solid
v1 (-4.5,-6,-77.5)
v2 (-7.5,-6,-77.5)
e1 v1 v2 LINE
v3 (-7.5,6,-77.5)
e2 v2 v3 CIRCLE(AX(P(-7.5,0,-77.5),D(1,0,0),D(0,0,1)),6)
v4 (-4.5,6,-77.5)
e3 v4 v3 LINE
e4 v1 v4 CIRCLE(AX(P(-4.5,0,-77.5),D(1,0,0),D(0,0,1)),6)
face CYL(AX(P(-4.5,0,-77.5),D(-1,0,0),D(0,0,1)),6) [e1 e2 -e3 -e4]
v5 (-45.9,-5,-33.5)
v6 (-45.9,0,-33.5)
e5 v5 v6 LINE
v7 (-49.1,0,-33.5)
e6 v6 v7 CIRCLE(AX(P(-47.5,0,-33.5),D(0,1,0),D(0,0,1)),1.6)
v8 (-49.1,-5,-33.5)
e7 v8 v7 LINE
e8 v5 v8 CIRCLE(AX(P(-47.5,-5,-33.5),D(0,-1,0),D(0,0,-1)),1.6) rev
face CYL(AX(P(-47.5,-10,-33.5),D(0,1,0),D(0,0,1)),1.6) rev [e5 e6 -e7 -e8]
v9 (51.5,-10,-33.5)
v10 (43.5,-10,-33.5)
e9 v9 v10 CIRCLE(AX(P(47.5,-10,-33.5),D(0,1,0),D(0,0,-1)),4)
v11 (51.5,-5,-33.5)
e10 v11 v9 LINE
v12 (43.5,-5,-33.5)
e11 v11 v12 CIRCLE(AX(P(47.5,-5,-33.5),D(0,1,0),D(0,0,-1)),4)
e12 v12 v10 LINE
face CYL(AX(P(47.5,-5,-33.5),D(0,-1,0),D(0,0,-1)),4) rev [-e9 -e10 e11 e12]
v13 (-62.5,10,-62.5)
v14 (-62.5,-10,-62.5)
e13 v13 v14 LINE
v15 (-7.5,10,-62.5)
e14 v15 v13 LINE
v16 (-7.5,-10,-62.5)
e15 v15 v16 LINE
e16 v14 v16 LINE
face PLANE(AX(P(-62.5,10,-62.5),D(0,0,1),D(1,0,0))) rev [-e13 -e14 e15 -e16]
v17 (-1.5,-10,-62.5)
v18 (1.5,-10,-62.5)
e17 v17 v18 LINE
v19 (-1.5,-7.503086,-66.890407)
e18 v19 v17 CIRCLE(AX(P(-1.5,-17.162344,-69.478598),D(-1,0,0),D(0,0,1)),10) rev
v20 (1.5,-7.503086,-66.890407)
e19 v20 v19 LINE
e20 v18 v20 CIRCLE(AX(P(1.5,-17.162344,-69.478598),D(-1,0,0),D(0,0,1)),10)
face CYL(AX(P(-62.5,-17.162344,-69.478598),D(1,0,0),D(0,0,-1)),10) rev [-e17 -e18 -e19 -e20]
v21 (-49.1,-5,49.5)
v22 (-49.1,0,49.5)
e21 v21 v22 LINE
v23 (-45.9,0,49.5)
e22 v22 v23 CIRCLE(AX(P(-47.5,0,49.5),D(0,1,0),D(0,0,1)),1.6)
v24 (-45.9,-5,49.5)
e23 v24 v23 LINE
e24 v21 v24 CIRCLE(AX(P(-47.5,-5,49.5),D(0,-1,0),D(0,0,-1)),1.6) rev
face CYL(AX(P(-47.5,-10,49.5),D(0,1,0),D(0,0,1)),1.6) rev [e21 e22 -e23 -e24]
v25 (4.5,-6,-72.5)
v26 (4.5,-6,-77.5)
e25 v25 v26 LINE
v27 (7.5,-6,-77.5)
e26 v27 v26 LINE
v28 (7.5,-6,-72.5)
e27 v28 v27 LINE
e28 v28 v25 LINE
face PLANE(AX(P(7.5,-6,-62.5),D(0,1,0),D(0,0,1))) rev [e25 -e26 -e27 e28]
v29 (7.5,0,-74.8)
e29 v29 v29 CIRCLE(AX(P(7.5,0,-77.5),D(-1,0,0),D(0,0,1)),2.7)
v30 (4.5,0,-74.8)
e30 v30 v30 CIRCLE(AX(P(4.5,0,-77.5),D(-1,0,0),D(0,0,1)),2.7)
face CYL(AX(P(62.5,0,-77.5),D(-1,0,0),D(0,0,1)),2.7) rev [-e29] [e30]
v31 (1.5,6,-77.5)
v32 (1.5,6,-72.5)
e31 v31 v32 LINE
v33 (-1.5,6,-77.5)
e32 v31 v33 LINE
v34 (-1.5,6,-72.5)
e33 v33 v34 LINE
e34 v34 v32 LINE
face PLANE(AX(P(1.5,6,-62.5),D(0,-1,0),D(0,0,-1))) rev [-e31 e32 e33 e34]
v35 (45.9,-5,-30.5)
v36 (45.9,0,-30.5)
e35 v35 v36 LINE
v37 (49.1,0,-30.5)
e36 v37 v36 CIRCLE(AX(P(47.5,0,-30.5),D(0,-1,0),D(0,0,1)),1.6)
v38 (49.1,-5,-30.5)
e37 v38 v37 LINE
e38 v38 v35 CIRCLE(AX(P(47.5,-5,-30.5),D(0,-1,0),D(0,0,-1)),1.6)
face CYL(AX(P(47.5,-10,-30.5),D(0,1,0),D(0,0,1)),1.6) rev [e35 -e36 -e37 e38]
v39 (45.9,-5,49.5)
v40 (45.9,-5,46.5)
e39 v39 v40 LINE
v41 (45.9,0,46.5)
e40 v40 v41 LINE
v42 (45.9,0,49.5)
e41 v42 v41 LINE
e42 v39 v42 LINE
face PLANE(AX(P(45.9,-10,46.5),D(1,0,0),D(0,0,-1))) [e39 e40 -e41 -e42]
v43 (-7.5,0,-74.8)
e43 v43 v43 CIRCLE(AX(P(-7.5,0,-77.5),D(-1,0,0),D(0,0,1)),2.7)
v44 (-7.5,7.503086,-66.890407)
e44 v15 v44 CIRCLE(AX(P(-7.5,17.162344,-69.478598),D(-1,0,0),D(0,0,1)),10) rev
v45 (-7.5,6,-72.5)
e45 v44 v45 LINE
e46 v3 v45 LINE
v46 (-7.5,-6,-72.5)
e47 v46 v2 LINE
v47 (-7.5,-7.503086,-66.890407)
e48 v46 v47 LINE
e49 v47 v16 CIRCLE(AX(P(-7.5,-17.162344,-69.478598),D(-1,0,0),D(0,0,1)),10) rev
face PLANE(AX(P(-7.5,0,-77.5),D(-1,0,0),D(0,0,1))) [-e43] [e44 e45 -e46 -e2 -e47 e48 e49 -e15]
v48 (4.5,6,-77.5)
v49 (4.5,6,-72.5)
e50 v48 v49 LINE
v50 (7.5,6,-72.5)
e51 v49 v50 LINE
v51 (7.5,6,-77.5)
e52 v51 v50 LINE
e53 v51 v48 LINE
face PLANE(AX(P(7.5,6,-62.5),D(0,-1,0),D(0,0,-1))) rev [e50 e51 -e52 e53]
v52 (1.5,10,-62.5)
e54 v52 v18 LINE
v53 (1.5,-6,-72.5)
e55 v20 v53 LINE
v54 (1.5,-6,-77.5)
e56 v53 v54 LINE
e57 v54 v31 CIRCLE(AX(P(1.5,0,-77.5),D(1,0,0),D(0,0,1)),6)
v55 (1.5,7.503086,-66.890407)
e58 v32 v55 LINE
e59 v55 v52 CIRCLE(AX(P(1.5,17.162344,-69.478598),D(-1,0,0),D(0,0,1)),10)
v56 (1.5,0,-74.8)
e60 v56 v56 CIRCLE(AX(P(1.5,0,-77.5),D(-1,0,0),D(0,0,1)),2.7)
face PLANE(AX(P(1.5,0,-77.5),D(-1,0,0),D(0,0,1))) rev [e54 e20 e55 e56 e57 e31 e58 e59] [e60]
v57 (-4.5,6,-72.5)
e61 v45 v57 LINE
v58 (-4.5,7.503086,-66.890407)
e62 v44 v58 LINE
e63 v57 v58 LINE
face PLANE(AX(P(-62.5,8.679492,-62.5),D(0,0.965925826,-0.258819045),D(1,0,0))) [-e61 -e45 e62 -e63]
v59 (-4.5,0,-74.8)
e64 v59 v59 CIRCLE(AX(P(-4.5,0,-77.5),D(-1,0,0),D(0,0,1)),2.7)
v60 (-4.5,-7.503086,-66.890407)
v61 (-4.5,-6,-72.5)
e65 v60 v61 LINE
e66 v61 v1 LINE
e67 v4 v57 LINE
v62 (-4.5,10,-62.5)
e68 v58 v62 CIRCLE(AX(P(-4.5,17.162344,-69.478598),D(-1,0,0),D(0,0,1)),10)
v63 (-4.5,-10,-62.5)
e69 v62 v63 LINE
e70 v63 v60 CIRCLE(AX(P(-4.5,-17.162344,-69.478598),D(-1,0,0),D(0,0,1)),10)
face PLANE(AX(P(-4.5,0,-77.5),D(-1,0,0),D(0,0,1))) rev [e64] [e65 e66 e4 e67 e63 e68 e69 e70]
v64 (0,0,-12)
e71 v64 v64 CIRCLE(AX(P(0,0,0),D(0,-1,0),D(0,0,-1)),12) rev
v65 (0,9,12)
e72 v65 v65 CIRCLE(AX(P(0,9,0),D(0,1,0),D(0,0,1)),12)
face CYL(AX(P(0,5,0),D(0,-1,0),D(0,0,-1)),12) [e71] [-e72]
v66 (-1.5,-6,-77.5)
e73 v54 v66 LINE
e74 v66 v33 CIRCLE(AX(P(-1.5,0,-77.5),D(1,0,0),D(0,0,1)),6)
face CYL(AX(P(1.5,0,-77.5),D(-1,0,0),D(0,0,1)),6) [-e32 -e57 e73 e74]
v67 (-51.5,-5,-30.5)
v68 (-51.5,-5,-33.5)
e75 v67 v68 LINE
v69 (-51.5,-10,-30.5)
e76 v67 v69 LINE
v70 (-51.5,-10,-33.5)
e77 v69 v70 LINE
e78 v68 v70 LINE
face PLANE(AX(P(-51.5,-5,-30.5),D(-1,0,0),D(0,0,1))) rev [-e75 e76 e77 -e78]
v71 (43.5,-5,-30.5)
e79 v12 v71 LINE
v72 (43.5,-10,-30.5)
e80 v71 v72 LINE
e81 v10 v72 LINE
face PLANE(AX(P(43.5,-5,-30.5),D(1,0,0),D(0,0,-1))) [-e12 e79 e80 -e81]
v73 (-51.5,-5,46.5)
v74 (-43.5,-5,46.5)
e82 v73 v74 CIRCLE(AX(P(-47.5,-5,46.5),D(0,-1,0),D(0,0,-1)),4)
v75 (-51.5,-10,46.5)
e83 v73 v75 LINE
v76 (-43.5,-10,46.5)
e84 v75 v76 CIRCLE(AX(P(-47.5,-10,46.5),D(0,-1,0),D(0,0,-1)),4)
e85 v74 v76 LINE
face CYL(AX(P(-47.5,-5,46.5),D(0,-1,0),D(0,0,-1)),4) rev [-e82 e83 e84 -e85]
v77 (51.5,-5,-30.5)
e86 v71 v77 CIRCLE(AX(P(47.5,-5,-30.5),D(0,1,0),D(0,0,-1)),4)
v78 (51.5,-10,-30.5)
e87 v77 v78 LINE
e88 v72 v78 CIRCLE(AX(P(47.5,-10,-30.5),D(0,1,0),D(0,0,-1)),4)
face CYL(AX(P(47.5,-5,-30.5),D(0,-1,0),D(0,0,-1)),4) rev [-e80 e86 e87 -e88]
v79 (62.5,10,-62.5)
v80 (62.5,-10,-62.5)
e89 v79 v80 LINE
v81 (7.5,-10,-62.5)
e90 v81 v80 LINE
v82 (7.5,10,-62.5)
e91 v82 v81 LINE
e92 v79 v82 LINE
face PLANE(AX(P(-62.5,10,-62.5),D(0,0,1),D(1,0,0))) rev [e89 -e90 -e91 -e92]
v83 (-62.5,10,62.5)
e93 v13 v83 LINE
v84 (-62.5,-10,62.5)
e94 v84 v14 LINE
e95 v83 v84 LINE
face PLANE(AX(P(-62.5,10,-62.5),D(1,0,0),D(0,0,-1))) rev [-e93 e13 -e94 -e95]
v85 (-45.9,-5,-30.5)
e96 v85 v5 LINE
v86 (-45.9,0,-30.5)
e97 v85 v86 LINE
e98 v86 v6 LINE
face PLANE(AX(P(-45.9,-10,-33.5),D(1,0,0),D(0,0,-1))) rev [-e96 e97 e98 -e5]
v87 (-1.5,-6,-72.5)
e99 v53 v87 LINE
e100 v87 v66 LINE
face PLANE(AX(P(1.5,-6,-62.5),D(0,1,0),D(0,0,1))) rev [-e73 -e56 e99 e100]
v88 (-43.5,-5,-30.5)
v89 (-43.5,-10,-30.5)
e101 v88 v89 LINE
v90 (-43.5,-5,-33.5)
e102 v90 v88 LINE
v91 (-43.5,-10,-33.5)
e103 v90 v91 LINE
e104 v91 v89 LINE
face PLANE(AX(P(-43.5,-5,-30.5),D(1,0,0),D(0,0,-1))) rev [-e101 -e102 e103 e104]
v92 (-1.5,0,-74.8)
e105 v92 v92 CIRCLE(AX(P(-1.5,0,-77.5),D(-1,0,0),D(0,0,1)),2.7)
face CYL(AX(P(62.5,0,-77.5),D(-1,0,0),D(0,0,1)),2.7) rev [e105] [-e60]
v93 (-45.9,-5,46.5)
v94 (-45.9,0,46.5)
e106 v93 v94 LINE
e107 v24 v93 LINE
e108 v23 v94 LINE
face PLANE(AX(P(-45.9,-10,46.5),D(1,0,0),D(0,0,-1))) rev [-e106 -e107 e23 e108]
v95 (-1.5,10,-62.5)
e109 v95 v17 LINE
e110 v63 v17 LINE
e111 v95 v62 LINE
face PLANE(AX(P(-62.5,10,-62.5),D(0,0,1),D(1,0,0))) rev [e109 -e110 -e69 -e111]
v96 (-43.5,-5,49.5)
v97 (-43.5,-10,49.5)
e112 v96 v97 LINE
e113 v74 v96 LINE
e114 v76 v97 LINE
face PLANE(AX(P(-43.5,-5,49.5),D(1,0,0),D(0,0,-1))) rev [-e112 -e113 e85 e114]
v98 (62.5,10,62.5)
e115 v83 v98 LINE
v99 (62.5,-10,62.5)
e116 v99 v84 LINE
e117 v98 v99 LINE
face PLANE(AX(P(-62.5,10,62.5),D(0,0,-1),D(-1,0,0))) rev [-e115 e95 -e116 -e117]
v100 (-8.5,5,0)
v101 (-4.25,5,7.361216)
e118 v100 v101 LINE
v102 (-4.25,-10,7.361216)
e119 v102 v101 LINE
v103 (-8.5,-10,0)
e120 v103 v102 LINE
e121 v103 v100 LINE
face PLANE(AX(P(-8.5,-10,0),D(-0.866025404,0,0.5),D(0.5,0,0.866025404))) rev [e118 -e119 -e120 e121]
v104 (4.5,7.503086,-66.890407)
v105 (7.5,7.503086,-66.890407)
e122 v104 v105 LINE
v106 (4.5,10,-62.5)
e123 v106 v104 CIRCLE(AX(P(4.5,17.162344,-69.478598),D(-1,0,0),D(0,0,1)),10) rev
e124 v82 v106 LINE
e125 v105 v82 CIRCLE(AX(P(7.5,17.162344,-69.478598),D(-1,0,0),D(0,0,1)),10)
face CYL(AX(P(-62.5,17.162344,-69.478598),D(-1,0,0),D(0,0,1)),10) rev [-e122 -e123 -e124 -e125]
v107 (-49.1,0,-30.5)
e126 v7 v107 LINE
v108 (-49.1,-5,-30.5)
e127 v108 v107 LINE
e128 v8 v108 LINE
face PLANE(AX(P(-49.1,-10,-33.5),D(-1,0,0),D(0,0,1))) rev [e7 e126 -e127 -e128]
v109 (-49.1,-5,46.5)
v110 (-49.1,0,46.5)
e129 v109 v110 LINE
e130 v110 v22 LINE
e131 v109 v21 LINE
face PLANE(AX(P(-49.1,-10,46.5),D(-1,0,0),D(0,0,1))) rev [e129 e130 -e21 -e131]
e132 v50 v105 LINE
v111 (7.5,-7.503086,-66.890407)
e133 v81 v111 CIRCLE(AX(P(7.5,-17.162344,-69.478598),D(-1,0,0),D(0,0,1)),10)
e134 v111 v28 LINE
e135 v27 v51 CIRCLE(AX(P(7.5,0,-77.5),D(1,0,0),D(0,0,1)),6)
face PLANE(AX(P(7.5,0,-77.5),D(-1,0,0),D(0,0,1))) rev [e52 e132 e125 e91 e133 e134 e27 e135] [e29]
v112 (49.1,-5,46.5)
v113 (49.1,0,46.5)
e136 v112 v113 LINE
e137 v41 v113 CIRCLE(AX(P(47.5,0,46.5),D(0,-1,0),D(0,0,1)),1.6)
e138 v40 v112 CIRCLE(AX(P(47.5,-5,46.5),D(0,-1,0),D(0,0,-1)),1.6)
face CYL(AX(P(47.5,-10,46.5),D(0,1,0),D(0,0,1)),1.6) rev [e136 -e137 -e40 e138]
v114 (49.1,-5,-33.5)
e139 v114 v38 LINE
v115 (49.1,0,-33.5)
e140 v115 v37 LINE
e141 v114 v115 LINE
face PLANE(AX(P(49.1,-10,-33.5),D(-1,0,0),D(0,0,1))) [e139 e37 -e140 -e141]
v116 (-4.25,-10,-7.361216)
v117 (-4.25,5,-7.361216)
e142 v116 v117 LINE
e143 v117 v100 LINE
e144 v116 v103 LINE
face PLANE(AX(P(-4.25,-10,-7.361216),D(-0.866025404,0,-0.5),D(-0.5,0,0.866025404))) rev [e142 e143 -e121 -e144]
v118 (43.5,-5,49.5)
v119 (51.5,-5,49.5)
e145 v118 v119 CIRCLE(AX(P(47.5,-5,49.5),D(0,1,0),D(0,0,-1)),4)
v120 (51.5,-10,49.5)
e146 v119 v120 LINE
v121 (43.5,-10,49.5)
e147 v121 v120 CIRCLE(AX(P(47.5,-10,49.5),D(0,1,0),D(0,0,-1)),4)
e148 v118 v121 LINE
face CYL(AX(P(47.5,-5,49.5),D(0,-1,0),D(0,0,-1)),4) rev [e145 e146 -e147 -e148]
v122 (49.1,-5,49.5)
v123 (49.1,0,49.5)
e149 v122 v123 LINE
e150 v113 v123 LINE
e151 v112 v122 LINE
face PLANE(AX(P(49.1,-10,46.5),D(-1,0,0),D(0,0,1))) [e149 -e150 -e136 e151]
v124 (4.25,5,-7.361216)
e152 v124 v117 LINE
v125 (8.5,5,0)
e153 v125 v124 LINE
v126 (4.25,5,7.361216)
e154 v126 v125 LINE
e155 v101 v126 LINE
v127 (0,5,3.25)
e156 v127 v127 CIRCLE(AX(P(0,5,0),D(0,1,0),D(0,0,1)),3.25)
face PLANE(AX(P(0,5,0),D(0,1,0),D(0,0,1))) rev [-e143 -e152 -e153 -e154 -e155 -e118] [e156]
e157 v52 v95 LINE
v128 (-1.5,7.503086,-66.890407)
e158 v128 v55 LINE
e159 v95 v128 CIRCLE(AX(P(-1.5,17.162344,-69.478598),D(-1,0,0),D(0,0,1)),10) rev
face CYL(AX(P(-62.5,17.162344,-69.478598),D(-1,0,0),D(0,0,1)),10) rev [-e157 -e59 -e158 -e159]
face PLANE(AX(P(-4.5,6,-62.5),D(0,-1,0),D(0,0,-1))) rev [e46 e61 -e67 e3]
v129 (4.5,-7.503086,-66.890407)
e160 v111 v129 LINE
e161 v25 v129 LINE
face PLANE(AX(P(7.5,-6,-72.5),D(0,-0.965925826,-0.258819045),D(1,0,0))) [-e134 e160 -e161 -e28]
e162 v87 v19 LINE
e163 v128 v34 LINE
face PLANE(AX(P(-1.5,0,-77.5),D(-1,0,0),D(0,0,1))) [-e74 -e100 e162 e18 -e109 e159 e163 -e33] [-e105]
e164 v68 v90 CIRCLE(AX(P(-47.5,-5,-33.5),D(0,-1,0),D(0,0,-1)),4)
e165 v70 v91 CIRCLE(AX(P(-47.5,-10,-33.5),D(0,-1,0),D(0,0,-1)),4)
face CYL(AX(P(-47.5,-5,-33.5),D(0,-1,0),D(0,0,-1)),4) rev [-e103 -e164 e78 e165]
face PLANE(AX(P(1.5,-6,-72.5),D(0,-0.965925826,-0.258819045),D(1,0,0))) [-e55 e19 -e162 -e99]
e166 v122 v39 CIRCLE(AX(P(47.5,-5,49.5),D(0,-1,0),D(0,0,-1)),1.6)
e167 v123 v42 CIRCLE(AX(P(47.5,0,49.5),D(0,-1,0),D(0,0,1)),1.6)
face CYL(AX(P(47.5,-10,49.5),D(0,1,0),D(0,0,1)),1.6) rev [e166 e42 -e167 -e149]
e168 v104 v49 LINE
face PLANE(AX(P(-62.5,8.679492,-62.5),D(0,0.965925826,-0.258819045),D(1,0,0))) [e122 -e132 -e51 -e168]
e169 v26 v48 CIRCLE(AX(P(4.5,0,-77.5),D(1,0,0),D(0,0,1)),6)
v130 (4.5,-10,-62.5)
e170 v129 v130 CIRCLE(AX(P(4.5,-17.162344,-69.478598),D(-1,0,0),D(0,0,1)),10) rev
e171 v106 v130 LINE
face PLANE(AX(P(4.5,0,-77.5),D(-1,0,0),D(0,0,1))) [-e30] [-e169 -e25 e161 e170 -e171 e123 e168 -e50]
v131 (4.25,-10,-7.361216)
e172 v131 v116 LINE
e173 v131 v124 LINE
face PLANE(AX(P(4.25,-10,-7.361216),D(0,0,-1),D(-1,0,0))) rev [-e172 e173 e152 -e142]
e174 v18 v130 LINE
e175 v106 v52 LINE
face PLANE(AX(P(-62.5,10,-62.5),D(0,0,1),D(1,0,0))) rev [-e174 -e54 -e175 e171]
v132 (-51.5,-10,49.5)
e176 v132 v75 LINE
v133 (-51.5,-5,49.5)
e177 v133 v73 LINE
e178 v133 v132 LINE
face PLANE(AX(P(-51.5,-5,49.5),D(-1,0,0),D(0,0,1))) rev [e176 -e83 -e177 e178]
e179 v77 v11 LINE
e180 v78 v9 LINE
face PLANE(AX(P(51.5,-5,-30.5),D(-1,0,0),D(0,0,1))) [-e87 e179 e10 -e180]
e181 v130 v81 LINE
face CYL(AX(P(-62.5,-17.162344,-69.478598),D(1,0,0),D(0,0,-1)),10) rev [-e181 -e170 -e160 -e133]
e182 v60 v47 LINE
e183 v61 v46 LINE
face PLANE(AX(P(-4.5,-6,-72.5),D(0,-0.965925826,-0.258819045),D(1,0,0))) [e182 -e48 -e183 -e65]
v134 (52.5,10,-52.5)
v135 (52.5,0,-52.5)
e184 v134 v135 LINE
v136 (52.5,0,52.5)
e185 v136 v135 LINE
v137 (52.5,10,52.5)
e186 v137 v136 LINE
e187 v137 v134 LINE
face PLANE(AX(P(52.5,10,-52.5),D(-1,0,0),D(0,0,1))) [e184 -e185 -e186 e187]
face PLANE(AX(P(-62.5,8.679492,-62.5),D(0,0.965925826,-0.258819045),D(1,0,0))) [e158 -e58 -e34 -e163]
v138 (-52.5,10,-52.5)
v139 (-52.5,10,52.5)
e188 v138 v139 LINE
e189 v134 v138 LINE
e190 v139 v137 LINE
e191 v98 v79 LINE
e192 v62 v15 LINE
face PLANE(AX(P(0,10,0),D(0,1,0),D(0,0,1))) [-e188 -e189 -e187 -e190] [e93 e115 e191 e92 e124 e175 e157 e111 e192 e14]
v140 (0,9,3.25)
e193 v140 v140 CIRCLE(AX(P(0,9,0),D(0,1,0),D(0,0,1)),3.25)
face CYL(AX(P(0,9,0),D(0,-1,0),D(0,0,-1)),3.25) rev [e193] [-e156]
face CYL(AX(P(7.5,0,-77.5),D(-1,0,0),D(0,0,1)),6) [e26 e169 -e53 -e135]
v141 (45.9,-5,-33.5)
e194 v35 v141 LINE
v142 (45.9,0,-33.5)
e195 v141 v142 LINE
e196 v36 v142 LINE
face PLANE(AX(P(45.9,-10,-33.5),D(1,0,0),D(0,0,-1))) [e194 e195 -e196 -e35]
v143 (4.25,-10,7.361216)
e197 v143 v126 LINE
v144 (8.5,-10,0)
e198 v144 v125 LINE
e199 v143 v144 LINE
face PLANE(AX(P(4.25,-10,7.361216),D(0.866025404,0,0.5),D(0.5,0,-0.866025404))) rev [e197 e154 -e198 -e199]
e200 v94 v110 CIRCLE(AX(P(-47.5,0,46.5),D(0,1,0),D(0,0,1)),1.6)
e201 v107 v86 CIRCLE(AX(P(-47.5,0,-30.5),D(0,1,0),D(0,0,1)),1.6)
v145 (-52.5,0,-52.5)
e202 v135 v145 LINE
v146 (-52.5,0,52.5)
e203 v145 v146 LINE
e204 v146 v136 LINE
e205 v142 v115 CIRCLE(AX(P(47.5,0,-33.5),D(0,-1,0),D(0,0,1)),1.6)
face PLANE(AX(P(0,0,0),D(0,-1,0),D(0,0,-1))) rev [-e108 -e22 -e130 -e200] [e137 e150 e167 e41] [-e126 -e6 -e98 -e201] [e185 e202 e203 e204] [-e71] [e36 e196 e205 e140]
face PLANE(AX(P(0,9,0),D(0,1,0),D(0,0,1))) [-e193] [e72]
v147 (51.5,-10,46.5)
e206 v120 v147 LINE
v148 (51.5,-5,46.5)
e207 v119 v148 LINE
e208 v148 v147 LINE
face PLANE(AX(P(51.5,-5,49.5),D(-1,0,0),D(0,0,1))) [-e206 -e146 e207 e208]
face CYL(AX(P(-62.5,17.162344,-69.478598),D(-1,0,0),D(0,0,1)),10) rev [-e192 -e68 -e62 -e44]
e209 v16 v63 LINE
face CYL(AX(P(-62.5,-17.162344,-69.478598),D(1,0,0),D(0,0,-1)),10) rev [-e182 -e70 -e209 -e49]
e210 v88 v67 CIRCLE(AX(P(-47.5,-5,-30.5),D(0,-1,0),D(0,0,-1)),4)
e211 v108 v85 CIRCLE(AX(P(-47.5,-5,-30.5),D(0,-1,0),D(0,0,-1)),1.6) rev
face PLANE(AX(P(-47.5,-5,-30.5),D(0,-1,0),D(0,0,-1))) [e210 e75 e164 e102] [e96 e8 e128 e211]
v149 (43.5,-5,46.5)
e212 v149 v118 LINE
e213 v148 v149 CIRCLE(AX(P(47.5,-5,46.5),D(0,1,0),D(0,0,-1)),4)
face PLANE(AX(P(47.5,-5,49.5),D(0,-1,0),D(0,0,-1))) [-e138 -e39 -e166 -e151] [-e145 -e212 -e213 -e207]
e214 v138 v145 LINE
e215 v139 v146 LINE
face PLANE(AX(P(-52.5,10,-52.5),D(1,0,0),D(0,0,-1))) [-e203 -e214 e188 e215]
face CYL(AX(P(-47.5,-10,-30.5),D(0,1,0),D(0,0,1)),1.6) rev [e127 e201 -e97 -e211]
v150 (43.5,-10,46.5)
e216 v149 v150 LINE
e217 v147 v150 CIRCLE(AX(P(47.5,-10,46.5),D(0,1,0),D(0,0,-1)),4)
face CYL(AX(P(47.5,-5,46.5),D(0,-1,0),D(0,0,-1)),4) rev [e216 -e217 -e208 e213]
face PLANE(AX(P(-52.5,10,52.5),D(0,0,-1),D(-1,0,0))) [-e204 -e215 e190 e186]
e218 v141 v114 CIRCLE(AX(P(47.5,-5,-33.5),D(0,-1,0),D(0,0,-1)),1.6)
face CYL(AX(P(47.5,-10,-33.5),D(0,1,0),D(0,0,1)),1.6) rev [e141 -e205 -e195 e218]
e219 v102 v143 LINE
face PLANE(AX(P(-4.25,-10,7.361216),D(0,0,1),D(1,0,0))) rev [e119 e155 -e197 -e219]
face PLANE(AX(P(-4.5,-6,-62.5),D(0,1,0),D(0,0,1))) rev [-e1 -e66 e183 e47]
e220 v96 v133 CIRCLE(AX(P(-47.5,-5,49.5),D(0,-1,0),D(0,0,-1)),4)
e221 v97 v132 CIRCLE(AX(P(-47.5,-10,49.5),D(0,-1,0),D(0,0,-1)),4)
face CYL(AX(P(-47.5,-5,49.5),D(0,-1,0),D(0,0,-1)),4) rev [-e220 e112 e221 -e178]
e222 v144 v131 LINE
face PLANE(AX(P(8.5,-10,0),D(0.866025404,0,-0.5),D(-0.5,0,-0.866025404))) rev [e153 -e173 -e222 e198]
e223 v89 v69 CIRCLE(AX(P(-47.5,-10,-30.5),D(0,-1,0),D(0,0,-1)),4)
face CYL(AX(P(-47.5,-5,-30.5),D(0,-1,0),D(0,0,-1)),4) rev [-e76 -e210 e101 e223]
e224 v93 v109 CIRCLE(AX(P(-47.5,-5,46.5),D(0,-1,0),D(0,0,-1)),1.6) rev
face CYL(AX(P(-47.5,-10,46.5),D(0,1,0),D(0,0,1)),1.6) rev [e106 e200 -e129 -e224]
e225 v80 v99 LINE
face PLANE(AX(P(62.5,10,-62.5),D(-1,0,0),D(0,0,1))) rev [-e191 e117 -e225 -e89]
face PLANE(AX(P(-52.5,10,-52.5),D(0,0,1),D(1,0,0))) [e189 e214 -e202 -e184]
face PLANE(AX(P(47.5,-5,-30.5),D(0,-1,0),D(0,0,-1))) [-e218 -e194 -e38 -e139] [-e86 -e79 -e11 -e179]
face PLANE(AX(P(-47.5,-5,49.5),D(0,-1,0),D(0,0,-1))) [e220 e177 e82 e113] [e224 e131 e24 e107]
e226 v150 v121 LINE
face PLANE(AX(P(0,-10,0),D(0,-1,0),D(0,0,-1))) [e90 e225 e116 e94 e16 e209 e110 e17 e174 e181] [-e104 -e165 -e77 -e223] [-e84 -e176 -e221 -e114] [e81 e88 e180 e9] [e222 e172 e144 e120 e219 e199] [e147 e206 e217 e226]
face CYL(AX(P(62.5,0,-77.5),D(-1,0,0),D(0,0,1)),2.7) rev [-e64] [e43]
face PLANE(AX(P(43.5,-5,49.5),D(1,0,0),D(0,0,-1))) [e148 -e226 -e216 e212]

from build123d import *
from OCP.BRepFilletAPI import BRepFilletAPI_MakeChamfer

# Parameters (mm, degrees)
SKETCH1_W           = 125
SKETCH1_H           = 125
SKETCH1_W_2         = 105
SKETCH1_H_2         = 105
BOSS_EXTRUDE1_DEPTH = 10
SKETCH2_W           = 125
SKETCH2_H           = 125
BOSS_EXTRUDE2_DEPTH = 10
CUT_EXTRUDE1_DEPTH  = 10
CUT_EXTRUDE2_DEPTH  = 5
BOSS_EXTRUDE4_DEPTH = 1.5
LPATTERN3_COUNT     = 2
LPATTERN3_PITCH     = 6
LPATTERN3_COL_COUNT = 2
LPATTERN3_COL_PITCH = 6
CHAMFER1_SIZE       = 10
CHAMFER1_SIZE2      = 2.679491924
FILLET1_R           = 10
SKETCH6_R           = 2.7
CUT_EXTRUDE3_DEPTH  = 110.417777349
CUT_EXTRUDE4_DEPTH  = 10
SKETCH8_R           = 12
BOSS_EXTRUDE5_DEPTH = 5
SKETCH9_R           = 12
SKETCH9_R_2         = 3.25
BOSS_EXTRUDE6_DEPTH = 4


with BuildPart() as part:
    # Sketch1 → Boss-Extrude1 (new body)
    with BuildSketch(Plane(origin=(0, 0, 0), x_dir=(1, 0, 0), z_dir=(0, 1, 0))):
        Rectangle(SKETCH1_W, SKETCH1_H)
        Rectangle(SKETCH1_W_2, SKETCH1_H_2, mode=Mode.SUBTRACT)
    extrude(amount=BOSS_EXTRUDE1_DEPTH)

    # Sketch2 → Boss-Extrude2 (add)
    with BuildSketch(Plane.XZ):
        Rectangle(SKETCH2_W, SKETCH2_H)
    extrude(amount=BOSS_EXTRUDE2_DEPTH)

    # Sketch3 → Cut-Extrude1 (cut)
    with BuildSketch(Plane(origin=(0, 0, 0), x_dir=(1, 0, 0), z_dir=(0, 1, 0))):
        with BuildLine():
            Line((-45.9, 33.5), (-45.9, 30.5))
            ThreePointArc((-45.9, 30.5), (-47.5, 28.9), (-49.1, 30.5))
            Line((-49.1, 30.5), (-49.1, 33.5))
            ThreePointArc((-49.1, 33.5), (-47.5, 35.1), (-45.9, 33.5))
        make_face()
        with BuildLine():
            Line((-45.9, -46.5), (-45.9, -49.5))
            ThreePointArc((-45.9, -49.5), (-47.5, -51.1), (-49.1, -49.5))
            Line((-49.1, -49.5), (-49.1, -46.5))
            ThreePointArc((-49.1, -46.5), (-47.5, -44.9), (-45.9, -46.5))
        make_face()
    cut_extrude1 = extrude(amount=-CUT_EXTRUDE1_DEPTH, mode=Mode.SUBTRACT)

    # Sketch4 → Cut-Extrude2 (cut)
    with BuildSketch(Plane.XZ.offset(10)):
        with BuildLine():
            Line((-43.5, 49.5), (-43.5, 46.5))
            ThreePointArc((-43.5, 46.5), (-47.5, 42.5), (-51.5, 46.5))
            Line((-51.5, 46.5), (-51.5, 49.5))
            ThreePointArc((-51.5, 49.5), (-47.5, 53.5), (-43.5, 49.5))
        make_face()
        with BuildLine():
            Line((-43.5, -30.5), (-43.5, -33.5))
            ThreePointArc((-43.5, -33.5), (-47.5, -37.5), (-51.5, -33.5))
            Line((-51.5, -33.5), (-51.5, -30.5))
            ThreePointArc((-51.5, -30.5), (-47.5, -26.5), (-43.5, -30.5))
        make_face()
    cut_extrude2 = extrude(amount=-CUT_EXTRUDE2_DEPTH, mode=Mode.SUBTRACT)

    # Mirror1: Cut-Extrude1, Cut-Extrude2 across plane
    add(cut_extrude1.mirror(Plane(origin=(0, 0, 0), x_dir=(0, 0, 1), z_dir=(1, 0, 0))), mode=Mode.SUBTRACT)
    add(cut_extrude2.mirror(Plane(origin=(0, 0, 0), x_dir=(0, 0, 1), z_dir=(1, 0, 0))), mode=Mode.SUBTRACT)

    # Sketch5 → Boss-Extrude4 (add, symmetric)
    with BuildSketch(Plane(origin=(0, 0, 0), x_dir=(0, 0, -1), z_dir=(1, 0, 0))):
        with BuildLine():
            Line((62.5, 6), (77.5, 6))
            ThreePointArc((77.5, 6), (83.5, 0), (77.5, -6))
            Line((77.5, -6), (62.5, -6))
            Line((62.5, -6), (62.5, 6))
        make_face()
    boss_extrude4 = extrude(amount=BOSS_EXTRUDE4_DEPTH, both=True)

    # LPattern3: Boss-Extrude4 ×2
    with Locations(*[(i * LPATTERN3_PITCH, 0, 0) for i in range(1, LPATTERN3_COUNT)]):
        add(boss_extrude4)

    # LPattern3 col: Boss-Extrude4 ×2
    with Locations(*[(-i * LPATTERN3_COL_PITCH, 0, 0) for i in range(1, LPATTERN3_COL_COUNT)]):
        add(boss_extrude4)

    # Chamfer1: one chamfer whose edges measure the first distance from different faces: ONE call of the kernel's chamfer builder (chamfer() names one face for all edges)
    chamfer1_edges_1 = [part.edges().sort_by_distance(p)[0] for p in [
        (0, 6, -62.5),
    ]]
    chamfer1_side_1 = [part.faces().sort_by_distance(p)[0] for p in [
        (0, 6, -70),
    ]]
    chamfer1_edges_2 = [part.edges().sort_by_distance(p)[0] for p in [
        (0, -6, -62.5),
    ]]
    chamfer1_side_2 = [part.faces().sort_by_distance(p)[0] for p in [
        (0, -6, -70),
    ]]
    chamfer1_edges_3 = [part.edges().sort_by_distance(p)[0] for p in [
        (-6, 6, -62.5),
    ]]
    chamfer1_side_3 = [part.faces().sort_by_distance(p)[0] for p in [
        (-6, 6, -70),
    ]]
    chamfer1_edges_4 = [part.edges().sort_by_distance(p)[0] for p in [
        (-6, -6, -62.5),
    ]]
    chamfer1_side_4 = [part.faces().sort_by_distance(p)[0] for p in [
        (-6, -6, -70),
    ]]
    chamfer1_edges_5 = [part.edges().sort_by_distance(p)[0] for p in [
        (6, 6, -62.5),
    ]]
    chamfer1_side_5 = [part.faces().sort_by_distance(p)[0] for p in [
        (6, 6, -70),
    ]]
    chamfer1_edges_6 = [part.edges().sort_by_distance(p)[0] for p in [
        (6, -6, -62.5),
    ]]
    chamfer1_side_6 = [part.faces().sort_by_distance(p)[0] for p in [
        (6, -6, -70),
    ]]
    chamfer1 = BRepFilletAPI_MakeChamfer(part.part.solid().wrapped)
    for e in chamfer1_edges_1:
        chamfer1.Add(CHAMFER1_SIZE, CHAMFER1_SIZE2, e.wrapped, chamfer1_side_1[0].wrapped)  # the first distance lies on this face
    for e in chamfer1_edges_2:
        chamfer1.Add(CHAMFER1_SIZE, CHAMFER1_SIZE2, e.wrapped, chamfer1_side_2[0].wrapped)  # the first distance lies on this face
    for e in chamfer1_edges_3:
        chamfer1.Add(CHAMFER1_SIZE, CHAMFER1_SIZE2, e.wrapped, chamfer1_side_3[0].wrapped)  # the first distance lies on this face
    for e in chamfer1_edges_4:
        chamfer1.Add(CHAMFER1_SIZE, CHAMFER1_SIZE2, e.wrapped, chamfer1_side_4[0].wrapped)  # the first distance lies on this face
    for e in chamfer1_edges_5:
        chamfer1.Add(CHAMFER1_SIZE, CHAMFER1_SIZE2, e.wrapped, chamfer1_side_5[0].wrapped)  # the first distance lies on this face
    for e in chamfer1_edges_6:
        chamfer1.Add(CHAMFER1_SIZE, CHAMFER1_SIZE2, e.wrapped, chamfer1_side_6[0].wrapped)  # the first distance lies on this face
    add(Compound.cast(chamfer1.Shape()), mode=Mode.REPLACE)

    # Fillet1
    # the kernel refuses this fillet: 10 mm, written as the material it adds along each edge
    with BuildSketch(Plane(origin=(-12.86321037, 8.679491924, -62.5), x_dir=(0, 1.0, -1.888670768796517e-12), z_dir=(1, 0, 0))) as fillet1_piece_1_section:
        with BuildLine():
            CenterArc((8.48285216, -6.978597797), FILLET1_R, 135.744454957, 29.255545043)
            Line((-1.176406103, -4.390407346), (-1.369591268, -4.338643537))
            Line((-1.369591268, -4.338643537), (-0.193185165, 0.051763809))
            Line((-0.193185165, 0.051763809), (0, 0.2))
            ThreePointArc((0, 0.2), (0.660254038, 0.2), (1.177261194, 0.139571956))
            Line((1.177261194, 0.139571956), (1.320508076, 0))
        make_face()
    fillet1_piece_1 = extrude(amount=14.36321037, mode=Mode.PRIVATE)
    fillet1_piece_1 = split(fillet1_piece_1, bisect_by=Plane(origin=(-7.5, 8.578111025, -63.798963953), z_dir=(1, 0, 0)), keep=Keep.TOP, mode=Mode.PRIVATE)
    fillet1_piece_1 = split(fillet1_piece_1, bisect_by=Plane(origin=(-4.5, 8.578111025, -63.798963953), z_dir=(-1, 0, 0)), keep=Keep.TOP, mode=Mode.PRIVATE)
    add(fillet1_piece_1)
    with BuildSketch(Plane(origin=(-1.5, 8.679491924, -62.5), x_dir=(0, 1.0, -1.888670768796517e-12), z_dir=(1, 0, 0)), Plane(origin=(-7.5, 8.679491924, -62.5), x_dir=(0, 1.0, -1.888670768796517e-12), z_dir=(1, 0, 0)), Plane(origin=(4.5, 8.679491924, -62.5), x_dir=(0, 1.0, -1.888670768796517e-12), z_dir=(1, 0, 0))) as fillet1_piece_2:
        with BuildLine():
            CenterArc((8.48285216, -6.978597797), FILLET1_R, 135.744454957, 29.255545043)
            Line((-1.176406103, -4.390407346), (-1.369591268, -4.338643537))
            Line((-1.369591268, -4.338643537), (-0.193185165, 0.051763809))
            Line((-0.193185165, 0.051763809), (0, 0.2))
            ThreePointArc((0, 0.2), (0.660254038, 0.2), (1.177261194, 0.139571956))
            Line((1.177261194, 0.139571956), (1.320508076, 0))
        make_face()
    extrude(amount=3)
    with BuildSketch(Plane(origin=(-1.5, 8.679491924, -62.5), x_dir=(0, 1.0, -1.888670768796517e-12), z_dir=(1, 0, 0))) as fillet1_piece_3_section:
        with BuildLine():
            CenterArc((8.48285216, -6.978597797), FILLET1_R, 135.744454957, 29.255545043)
            Line((-1.176406103, -4.390407346), (-1.369591268, -4.338643537))
            Line((-1.369591268, -4.338643537), (-0.193185165, 0.051763809))
            Line((-0.193185165, 0.051763809), (0, 0.2))
            ThreePointArc((0, 0.2), (0.660254038, 0.2), (1.177261194, 0.139571956))
            Line((1.177261194, 0.139571956), (1.320508076, 0))
        make_face()
    fillet1_piece_3 = extrude(amount=14.36321037, mode=Mode.PRIVATE)
    fillet1_piece_3 = split(fillet1_piece_3, bisect_by=Plane(origin=(4.5, 8.578111025, -63.798963953), z_dir=(1, 0, 0)), keep=Keep.TOP, mode=Mode.PRIVATE)
    fillet1_piece_3 = split(fillet1_piece_3, bisect_by=Plane(origin=(7.5, 8.578111025, -63.798963953), z_dir=(-1, 0, 0)), keep=Keep.TOP, mode=Mode.PRIVATE)
    add(fillet1_piece_3)
    with BuildSketch(Plane(origin=(-12.86321037, -8.679491924, -62.5), x_dir=(0, -1.0, -1.7756733723730064e-12), z_dir=(1, 0, 0))) as fillet1_piece_4_section:
        with BuildLine():
            CenterArc((8.48285216, 6.978597797), FILLET1_R, 195, 29.255545043)
            Line((-1.176406103, 4.390407346), (-1.369591268, 4.338643537))
            Line((-1.369591268, 4.338643537), (-0.193185165, -0.051763809))
            Line((-0.193185165, -0.051763809), (0, -0.2))
            ThreePointArc((0, -0.2), (0.660254038, -0.2), (1.177261194, -0.139571956))
            Line((1.177261194, -0.139571956), (1.320508076, 0))
        make_face()
    fillet1_piece_4 = extrude(amount=14.36321037, mode=Mode.PRIVATE)
    fillet1_piece_4 = split(fillet1_piece_4, bisect_by=Plane(origin=(-4.5, -8.578111025, -63.798963953), z_dir=(-1, 0, 0)), keep=Keep.TOP, mode=Mode.PRIVATE)
    fillet1_piece_4 = split(fillet1_piece_4, bisect_by=Plane(origin=(-7.5, -8.578111025, -63.798963953), z_dir=(1, 0, 0)), keep=Keep.TOP, mode=Mode.PRIVATE)
    add(fillet1_piece_4)
    with BuildSketch(Plane(origin=(-1.5, -8.679491924, -62.5), x_dir=(0, -1.0, -1.9155749108021166e-12), z_dir=(1, 0, 0)), Plane(origin=(-7.5, -8.679491924, -62.5), x_dir=(0, -1.0, -1.7756733723730064e-12), z_dir=(1, 0, 0)), Plane(origin=(4.5, -8.679491924, -62.5), x_dir=(0, -1.0, -1.7756733723730064e-12), z_dir=(1, 0, 0))) as fillet1_piece_5:
        with BuildLine():
            CenterArc((8.48285216, 6.978597797), FILLET1_R, 195, 29.255545043)
            Line((-1.176406103, 4.390407346), (-1.369591268, 4.338643537))
            Line((-1.369591268, 4.338643537), (-0.193185165, -0.051763809))
            Line((-0.193185165, -0.051763809), (0, -0.2))
            ThreePointArc((0, -0.2), (0.660254038, -0.2), (1.177261194, -0.139571956))
            Line((1.177261194, -0.139571956), (1.320508076, 0))
        make_face()
    extrude(amount=3)
    with BuildSketch(Plane(origin=(-1.5, -8.679491924, -62.5), x_dir=(0, -1.0, -1.9155749108021166e-12), z_dir=(1, 0, 0))) as fillet1_piece_6_section:
        with BuildLine():
            CenterArc((8.48285216, 6.978597797), FILLET1_R, 195, 29.255545043)
            Line((-1.176406103, 4.390407346), (-1.369591268, 4.338643537))
            Line((-1.369591268, 4.338643537), (-0.193185165, -0.051763809))
            Line((-0.193185165, -0.051763809), (0, -0.2))
            ThreePointArc((0, -0.2), (0.660254038, -0.2), (1.177261194, -0.139571956))
            Line((1.177261194, -0.139571956), (1.320508076, 0))
        make_face()
    fillet1_piece_6 = extrude(amount=14.36321037, mode=Mode.PRIVATE)
    fillet1_piece_6 = split(fillet1_piece_6, bisect_by=Plane(origin=(7.5, -8.578111025, -63.798963953), z_dir=(-1, 0, 0)), keep=Keep.TOP, mode=Mode.PRIVATE)
    fillet1_piece_6 = split(fillet1_piece_6, bisect_by=Plane(origin=(4.5, -8.578111025, -63.798963953), z_dir=(1, 0, 0)), keep=Keep.TOP, mode=Mode.PRIVATE)
    add(fillet1_piece_6)
    with BuildSketch(Plane(origin=(-7.5, -8.679491924, -62.5), x_dir=(0, -1.0, -1.7756733723730064e-12), z_dir=(1, 0, 0))) as fillet1_piece_7_section:
        with BuildLine():
            CenterArc((8.48285216, 6.978597797), FILLET1_R, 195, 29.255545043)
            Line((-1.176406103, 4.390407346), (-1.369591268, 4.338643537))
            Line((-1.369591268, 4.338643537), (-0.193185165, -0.051763809))
            Line((-0.193185165, -0.051763809), (0, -0.2))
            ThreePointArc((0, -0.2), (0.660254038, -0.2), (1.177261194, -0.139571956))
            Line((1.177261194, -0.139571956), (1.320508076, 0))
        make_face()
    fillet1_piece_7 = extrude(amount=14.36321037, mode=Mode.PRIVATE)
    fillet1_piece_7 = split(fillet1_piece_7, bisect_by=Plane(origin=(1.5, -8.578111025, -63.798963953), z_dir=(-1, 0, 0)), keep=Keep.TOP, mode=Mode.PRIVATE)
    fillet1_piece_7 = split(fillet1_piece_7, bisect_by=Plane(origin=(-1.5, -8.578111025, -63.798963953), z_dir=(1, 0, 0)), keep=Keep.TOP, mode=Mode.PRIVATE)
    add(fillet1_piece_7)
    with BuildSketch(Plane(origin=(-7.5, -8.679491924, -62.5), x_dir=(0, -1.0, -1.7756733723730064e-12), z_dir=(1, 0, 0))) as fillet1_piece_8_section:
        with BuildLine():
            CenterArc((8.48285216, 6.978597797), FILLET1_R, 195, 29.255545043)
            Line((-1.176406103, 4.390407346), (-1.369591268, 4.338643537))
            Line((-1.369591268, 4.338643537), (-0.193185165, -0.051763809))
            Line((-0.193185165, -0.051763809), (0, -0.2))
            ThreePointArc((0, -0.2), (0.660254038, -0.2), (1.177261194, -0.139571956))
            Line((1.177261194, -0.139571956), (1.320508076, 0))
        make_face()
    fillet1_piece_8 = extrude(amount=14.36321037, mode=Mode.PRIVATE)
    fillet1_piece_8 = split(fillet1_piece_8, bisect_by=Plane(origin=(4.5, -8.578111025, -63.798963953), z_dir=(1, 0, 0)), keep=Keep.TOP, mode=Mode.PRIVATE)
    add(fillet1_piece_8)
    with BuildSketch(Plane(origin=(-6.86321037, -8.679491924, -62.5), x_dir=(0, -1.0, -1.9155749108021166e-12), z_dir=(1, 0, 0))) as fillet1_piece_9_section:
        with BuildLine():
            CenterArc((8.48285216, 6.978597797), FILLET1_R, 195, 29.255545043)
            Line((-1.176406103, 4.390407346), (-1.369591268, 4.338643537))
            Line((-1.369591268, 4.338643537), (-0.193185165, -0.051763809))
            Line((-0.193185165, -0.051763809), (0, -0.2))
            ThreePointArc((0, -0.2), (0.660254038, -0.2), (1.177261194, -0.139571956))
            Line((1.177261194, -0.139571956), (1.320508076, 0))
        make_face()
    fillet1_piece_9 = extrude(amount=14.36321037, mode=Mode.PRIVATE)
    fillet1_piece_9 = split(fillet1_piece_9, bisect_by=Plane(origin=(-4.5, -8.578111025, -63.798963953), z_dir=(-1, 0, 0)), keep=Keep.TOP, mode=Mode.PRIVATE)
    add(fillet1_piece_9)
    with BuildSketch(Plane(origin=(-6.86321037, -8.679491924, -62.5), x_dir=(0, -1.0, -1.9155749108021166e-12), z_dir=(1, 0, 0))) as fillet1_piece_10_section:
        with BuildLine():
            CenterArc((8.48285216, 6.978597797), FILLET1_R, 195, 29.255545043)
            Line((-1.176406103, 4.390407346), (-1.369591268, 4.338643537))
            Line((-1.369591268, 4.338643537), (-0.193185165, -0.051763809))
            Line((-0.193185165, -0.051763809), (0, -0.2))
            ThreePointArc((0, -0.2), (0.660254038, -0.2), (1.177261194, -0.139571956))
            Line((1.177261194, -0.139571956), (1.320508076, 0))
        make_face()
    fillet1_piece_10 = extrude(amount=14.36321037, mode=Mode.PRIVATE)
    fillet1_piece_10 = split(fillet1_piece_10, bisect_by=Plane(origin=(1.5, -8.578111025, -63.798963953), z_dir=(-1, 0, 0)), keep=Keep.TOP, mode=Mode.PRIVATE)
    fillet1_piece_10 = split(fillet1_piece_10, bisect_by=Plane(origin=(-1.5, -8.578111025, -63.798963953), z_dir=(1, 0, 0)), keep=Keep.TOP, mode=Mode.PRIVATE)
    add(fillet1_piece_10)
    with BuildSketch(Plane(origin=(-7.5, 8.679491924, -62.5), x_dir=(0, 1.0, -1.888670768796517e-12), z_dir=(1, 0, 0))) as fillet1_piece_11_section:
        with BuildLine():
            CenterArc((8.48285216, -6.978597797), FILLET1_R, 135.744454957, 29.255545043)
            Line((-1.176406103, -4.390407346), (-1.369591268, -4.338643537))
            Line((-1.369591268, -4.338643537), (-0.193185165, 0.051763809))
            Line((-0.193185165, 0.051763809), (0, 0.2))
            ThreePointArc((0, 0.2), (0.660254038, 0.2), (1.177261194, 0.139571956))
            Line((1.177261194, 0.139571956), (1.320508076, 0))
        make_face()
    fillet1_piece_11 = extrude(amount=14.36321037, mode=Mode.PRIVATE)
    fillet1_piece_11 = split(fillet1_piece_11, bisect_by=Plane(origin=(-1.5, 8.578111025, -63.798963953), z_dir=(1, 0, 0)), keep=Keep.TOP, mode=Mode.PRIVATE)
    fillet1_piece_11 = split(fillet1_piece_11, bisect_by=Plane(origin=(1.5, 8.578111025, -63.798963953), z_dir=(-1, 0, 0)), keep=Keep.TOP, mode=Mode.PRIVATE)
    add(fillet1_piece_11)
    with BuildSketch(Plane(origin=(-7.5, 8.679491924, -62.5), x_dir=(0, 1.0, -1.888670768796517e-12), z_dir=(1, 0, 0))) as fillet1_piece_12_section:
        with BuildLine():
            CenterArc((8.48285216, -6.978597797), FILLET1_R, 135.744454957, 29.255545043)
            Line((-1.176406103, -4.390407346), (-1.369591268, -4.338643537))
            Line((-1.369591268, -4.338643537), (-0.193185165, 0.051763809))
            Line((-0.193185165, 0.051763809), (0, 0.2))
            ThreePointArc((0, 0.2), (0.660254038, 0.2), (1.177261194, 0.139571956))
            Line((1.177261194, 0.139571956), (1.320508076, 0))
        make_face()
    fillet1_piece_12 = extrude(amount=14.36321037, mode=Mode.PRIVATE)
    fillet1_piece_12 = split(fillet1_piece_12, bisect_by=Plane(origin=(4.5, 8.578111025, -63.798963953), z_dir=(1, 0, 0)), keep=Keep.TOP, mode=Mode.PRIVATE)
    add(fillet1_piece_12)
    with BuildSketch(Plane(origin=(-6.86321037, 8.679491924, -62.5), x_dir=(0, 1.0, -1.8832899403953976e-12), z_dir=(1, 0, 0))) as fillet1_piece_13_section:
        with BuildLine():
            CenterArc((8.48285216, -6.978597797), FILLET1_R, 135.744454957, 29.255545043)
            Line((-1.176406103, -4.390407346), (-1.369591268, -4.338643537))
            Line((-1.369591268, -4.338643537), (-0.193185165, 0.051763809))
            Line((-0.193185165, 0.051763809), (0, 0.2))
            ThreePointArc((0, 0.2), (0.660254038, 0.2), (1.177261194, 0.139571956))
            Line((1.177261194, 0.139571956), (1.320508076, 0))
        make_face()
    fillet1_piece_13 = extrude(amount=14.36321037, mode=Mode.PRIVATE)
    fillet1_piece_13 = split(fillet1_piece_13, bisect_by=Plane(origin=(-4.5, 8.578111025, -63.798963953), z_dir=(-1, 0, 0)), keep=Keep.TOP, mode=Mode.PRIVATE)
    add(fillet1_piece_13)
    with BuildSketch(Plane(origin=(-6.86321037, 8.679491924, -62.5), x_dir=(0, 1.0, -1.8832899403953976e-12), z_dir=(1, 0, 0))) as fillet1_piece_14_section:
        with BuildLine():
            CenterArc((8.48285216, -6.978597797), FILLET1_R, 135.744454957, 29.255545043)
            Line((-1.176406103, -4.390407346), (-1.369591268, -4.338643537))
            Line((-1.369591268, -4.338643537), (-0.193185165, 0.051763809))
            Line((-0.193185165, 0.051763809), (0, 0.2))
            ThreePointArc((0, 0.2), (0.660254038, 0.2), (1.177261194, 0.139571956))
            Line((1.177261194, 0.139571956), (1.320508076, 0))
        make_face()
    fillet1_piece_14 = extrude(amount=14.36321037, mode=Mode.PRIVATE)
    fillet1_piece_14 = split(fillet1_piece_14, bisect_by=Plane(origin=(-1.5, 8.578111025, -63.798963953), z_dir=(1, 0, 0)), keep=Keep.TOP, mode=Mode.PRIVATE)
    fillet1_piece_14 = split(fillet1_piece_14, bisect_by=Plane(origin=(1.5, 8.578111025, -63.798963953), z_dir=(-1, 0, 0)), keep=Keep.TOP, mode=Mode.PRIVATE)
    add(fillet1_piece_14)

    # Sketch6 → Cut-Extrude3 (cut, through all)
    with BuildSketch(Plane.ZY.offset(7.5)):
        with Locations((-77.5, 0)):
            Circle(SKETCH6_R)
    extrude(amount=-CUT_EXTRUDE3_DEPTH, mode=Mode.SUBTRACT)

    # Sketch7 → Cut-Extrude4 (cut)
    with BuildSketch(Plane(origin=(0, 0, 0), x_dir=(1, 0, 0), z_dir=(0, 1, 0))):
        Polygon((8.5, 0), (4.25, 7.361215932), (-4.25, 7.361215932), (-8.5, 0), (-4.25, -7.361215932), (4.25, -7.361215932), align=None)
    extrude(amount=-CUT_EXTRUDE4_DEPTH, mode=Mode.SUBTRACT)

    # Sketch8 → Boss-Extrude5 (add)
    with BuildSketch(Plane(origin=(0, 0, 0), x_dir=(1, 0, 0), z_dir=(0, 1, 0))):
        with Locations(Location((0, 0, 0), (0, 0, 90))):
            Circle(SKETCH8_R)
        Polygon((8.5, 0), (4.25, 7.361215932), (-4.25, 7.361215932), (-8.5, 0), (-4.25, -7.361215932), (4.25, -7.361215932), align=None, mode=Mode.SUBTRACT)
    extrude(amount=BOSS_EXTRUDE5_DEPTH)

    # Sketch9 → Boss-Extrude6 (add)
    with BuildSketch(Plane(origin=(0, 5, 0), x_dir=(1, 0, 0), z_dir=(0, 1, 0))):
        with Locations(Location((0, 0, 0), (0, 0, 90))):
            Circle(SKETCH9_R)
        with Locations(Location((0, 0, 0), (0, 0, 270))):
            Circle(SKETCH9_R_2, mode=Mode.SUBTRACT)
    extrude(amount=BOSS_EXTRUDE6_DEPTH)


solid = part.part
